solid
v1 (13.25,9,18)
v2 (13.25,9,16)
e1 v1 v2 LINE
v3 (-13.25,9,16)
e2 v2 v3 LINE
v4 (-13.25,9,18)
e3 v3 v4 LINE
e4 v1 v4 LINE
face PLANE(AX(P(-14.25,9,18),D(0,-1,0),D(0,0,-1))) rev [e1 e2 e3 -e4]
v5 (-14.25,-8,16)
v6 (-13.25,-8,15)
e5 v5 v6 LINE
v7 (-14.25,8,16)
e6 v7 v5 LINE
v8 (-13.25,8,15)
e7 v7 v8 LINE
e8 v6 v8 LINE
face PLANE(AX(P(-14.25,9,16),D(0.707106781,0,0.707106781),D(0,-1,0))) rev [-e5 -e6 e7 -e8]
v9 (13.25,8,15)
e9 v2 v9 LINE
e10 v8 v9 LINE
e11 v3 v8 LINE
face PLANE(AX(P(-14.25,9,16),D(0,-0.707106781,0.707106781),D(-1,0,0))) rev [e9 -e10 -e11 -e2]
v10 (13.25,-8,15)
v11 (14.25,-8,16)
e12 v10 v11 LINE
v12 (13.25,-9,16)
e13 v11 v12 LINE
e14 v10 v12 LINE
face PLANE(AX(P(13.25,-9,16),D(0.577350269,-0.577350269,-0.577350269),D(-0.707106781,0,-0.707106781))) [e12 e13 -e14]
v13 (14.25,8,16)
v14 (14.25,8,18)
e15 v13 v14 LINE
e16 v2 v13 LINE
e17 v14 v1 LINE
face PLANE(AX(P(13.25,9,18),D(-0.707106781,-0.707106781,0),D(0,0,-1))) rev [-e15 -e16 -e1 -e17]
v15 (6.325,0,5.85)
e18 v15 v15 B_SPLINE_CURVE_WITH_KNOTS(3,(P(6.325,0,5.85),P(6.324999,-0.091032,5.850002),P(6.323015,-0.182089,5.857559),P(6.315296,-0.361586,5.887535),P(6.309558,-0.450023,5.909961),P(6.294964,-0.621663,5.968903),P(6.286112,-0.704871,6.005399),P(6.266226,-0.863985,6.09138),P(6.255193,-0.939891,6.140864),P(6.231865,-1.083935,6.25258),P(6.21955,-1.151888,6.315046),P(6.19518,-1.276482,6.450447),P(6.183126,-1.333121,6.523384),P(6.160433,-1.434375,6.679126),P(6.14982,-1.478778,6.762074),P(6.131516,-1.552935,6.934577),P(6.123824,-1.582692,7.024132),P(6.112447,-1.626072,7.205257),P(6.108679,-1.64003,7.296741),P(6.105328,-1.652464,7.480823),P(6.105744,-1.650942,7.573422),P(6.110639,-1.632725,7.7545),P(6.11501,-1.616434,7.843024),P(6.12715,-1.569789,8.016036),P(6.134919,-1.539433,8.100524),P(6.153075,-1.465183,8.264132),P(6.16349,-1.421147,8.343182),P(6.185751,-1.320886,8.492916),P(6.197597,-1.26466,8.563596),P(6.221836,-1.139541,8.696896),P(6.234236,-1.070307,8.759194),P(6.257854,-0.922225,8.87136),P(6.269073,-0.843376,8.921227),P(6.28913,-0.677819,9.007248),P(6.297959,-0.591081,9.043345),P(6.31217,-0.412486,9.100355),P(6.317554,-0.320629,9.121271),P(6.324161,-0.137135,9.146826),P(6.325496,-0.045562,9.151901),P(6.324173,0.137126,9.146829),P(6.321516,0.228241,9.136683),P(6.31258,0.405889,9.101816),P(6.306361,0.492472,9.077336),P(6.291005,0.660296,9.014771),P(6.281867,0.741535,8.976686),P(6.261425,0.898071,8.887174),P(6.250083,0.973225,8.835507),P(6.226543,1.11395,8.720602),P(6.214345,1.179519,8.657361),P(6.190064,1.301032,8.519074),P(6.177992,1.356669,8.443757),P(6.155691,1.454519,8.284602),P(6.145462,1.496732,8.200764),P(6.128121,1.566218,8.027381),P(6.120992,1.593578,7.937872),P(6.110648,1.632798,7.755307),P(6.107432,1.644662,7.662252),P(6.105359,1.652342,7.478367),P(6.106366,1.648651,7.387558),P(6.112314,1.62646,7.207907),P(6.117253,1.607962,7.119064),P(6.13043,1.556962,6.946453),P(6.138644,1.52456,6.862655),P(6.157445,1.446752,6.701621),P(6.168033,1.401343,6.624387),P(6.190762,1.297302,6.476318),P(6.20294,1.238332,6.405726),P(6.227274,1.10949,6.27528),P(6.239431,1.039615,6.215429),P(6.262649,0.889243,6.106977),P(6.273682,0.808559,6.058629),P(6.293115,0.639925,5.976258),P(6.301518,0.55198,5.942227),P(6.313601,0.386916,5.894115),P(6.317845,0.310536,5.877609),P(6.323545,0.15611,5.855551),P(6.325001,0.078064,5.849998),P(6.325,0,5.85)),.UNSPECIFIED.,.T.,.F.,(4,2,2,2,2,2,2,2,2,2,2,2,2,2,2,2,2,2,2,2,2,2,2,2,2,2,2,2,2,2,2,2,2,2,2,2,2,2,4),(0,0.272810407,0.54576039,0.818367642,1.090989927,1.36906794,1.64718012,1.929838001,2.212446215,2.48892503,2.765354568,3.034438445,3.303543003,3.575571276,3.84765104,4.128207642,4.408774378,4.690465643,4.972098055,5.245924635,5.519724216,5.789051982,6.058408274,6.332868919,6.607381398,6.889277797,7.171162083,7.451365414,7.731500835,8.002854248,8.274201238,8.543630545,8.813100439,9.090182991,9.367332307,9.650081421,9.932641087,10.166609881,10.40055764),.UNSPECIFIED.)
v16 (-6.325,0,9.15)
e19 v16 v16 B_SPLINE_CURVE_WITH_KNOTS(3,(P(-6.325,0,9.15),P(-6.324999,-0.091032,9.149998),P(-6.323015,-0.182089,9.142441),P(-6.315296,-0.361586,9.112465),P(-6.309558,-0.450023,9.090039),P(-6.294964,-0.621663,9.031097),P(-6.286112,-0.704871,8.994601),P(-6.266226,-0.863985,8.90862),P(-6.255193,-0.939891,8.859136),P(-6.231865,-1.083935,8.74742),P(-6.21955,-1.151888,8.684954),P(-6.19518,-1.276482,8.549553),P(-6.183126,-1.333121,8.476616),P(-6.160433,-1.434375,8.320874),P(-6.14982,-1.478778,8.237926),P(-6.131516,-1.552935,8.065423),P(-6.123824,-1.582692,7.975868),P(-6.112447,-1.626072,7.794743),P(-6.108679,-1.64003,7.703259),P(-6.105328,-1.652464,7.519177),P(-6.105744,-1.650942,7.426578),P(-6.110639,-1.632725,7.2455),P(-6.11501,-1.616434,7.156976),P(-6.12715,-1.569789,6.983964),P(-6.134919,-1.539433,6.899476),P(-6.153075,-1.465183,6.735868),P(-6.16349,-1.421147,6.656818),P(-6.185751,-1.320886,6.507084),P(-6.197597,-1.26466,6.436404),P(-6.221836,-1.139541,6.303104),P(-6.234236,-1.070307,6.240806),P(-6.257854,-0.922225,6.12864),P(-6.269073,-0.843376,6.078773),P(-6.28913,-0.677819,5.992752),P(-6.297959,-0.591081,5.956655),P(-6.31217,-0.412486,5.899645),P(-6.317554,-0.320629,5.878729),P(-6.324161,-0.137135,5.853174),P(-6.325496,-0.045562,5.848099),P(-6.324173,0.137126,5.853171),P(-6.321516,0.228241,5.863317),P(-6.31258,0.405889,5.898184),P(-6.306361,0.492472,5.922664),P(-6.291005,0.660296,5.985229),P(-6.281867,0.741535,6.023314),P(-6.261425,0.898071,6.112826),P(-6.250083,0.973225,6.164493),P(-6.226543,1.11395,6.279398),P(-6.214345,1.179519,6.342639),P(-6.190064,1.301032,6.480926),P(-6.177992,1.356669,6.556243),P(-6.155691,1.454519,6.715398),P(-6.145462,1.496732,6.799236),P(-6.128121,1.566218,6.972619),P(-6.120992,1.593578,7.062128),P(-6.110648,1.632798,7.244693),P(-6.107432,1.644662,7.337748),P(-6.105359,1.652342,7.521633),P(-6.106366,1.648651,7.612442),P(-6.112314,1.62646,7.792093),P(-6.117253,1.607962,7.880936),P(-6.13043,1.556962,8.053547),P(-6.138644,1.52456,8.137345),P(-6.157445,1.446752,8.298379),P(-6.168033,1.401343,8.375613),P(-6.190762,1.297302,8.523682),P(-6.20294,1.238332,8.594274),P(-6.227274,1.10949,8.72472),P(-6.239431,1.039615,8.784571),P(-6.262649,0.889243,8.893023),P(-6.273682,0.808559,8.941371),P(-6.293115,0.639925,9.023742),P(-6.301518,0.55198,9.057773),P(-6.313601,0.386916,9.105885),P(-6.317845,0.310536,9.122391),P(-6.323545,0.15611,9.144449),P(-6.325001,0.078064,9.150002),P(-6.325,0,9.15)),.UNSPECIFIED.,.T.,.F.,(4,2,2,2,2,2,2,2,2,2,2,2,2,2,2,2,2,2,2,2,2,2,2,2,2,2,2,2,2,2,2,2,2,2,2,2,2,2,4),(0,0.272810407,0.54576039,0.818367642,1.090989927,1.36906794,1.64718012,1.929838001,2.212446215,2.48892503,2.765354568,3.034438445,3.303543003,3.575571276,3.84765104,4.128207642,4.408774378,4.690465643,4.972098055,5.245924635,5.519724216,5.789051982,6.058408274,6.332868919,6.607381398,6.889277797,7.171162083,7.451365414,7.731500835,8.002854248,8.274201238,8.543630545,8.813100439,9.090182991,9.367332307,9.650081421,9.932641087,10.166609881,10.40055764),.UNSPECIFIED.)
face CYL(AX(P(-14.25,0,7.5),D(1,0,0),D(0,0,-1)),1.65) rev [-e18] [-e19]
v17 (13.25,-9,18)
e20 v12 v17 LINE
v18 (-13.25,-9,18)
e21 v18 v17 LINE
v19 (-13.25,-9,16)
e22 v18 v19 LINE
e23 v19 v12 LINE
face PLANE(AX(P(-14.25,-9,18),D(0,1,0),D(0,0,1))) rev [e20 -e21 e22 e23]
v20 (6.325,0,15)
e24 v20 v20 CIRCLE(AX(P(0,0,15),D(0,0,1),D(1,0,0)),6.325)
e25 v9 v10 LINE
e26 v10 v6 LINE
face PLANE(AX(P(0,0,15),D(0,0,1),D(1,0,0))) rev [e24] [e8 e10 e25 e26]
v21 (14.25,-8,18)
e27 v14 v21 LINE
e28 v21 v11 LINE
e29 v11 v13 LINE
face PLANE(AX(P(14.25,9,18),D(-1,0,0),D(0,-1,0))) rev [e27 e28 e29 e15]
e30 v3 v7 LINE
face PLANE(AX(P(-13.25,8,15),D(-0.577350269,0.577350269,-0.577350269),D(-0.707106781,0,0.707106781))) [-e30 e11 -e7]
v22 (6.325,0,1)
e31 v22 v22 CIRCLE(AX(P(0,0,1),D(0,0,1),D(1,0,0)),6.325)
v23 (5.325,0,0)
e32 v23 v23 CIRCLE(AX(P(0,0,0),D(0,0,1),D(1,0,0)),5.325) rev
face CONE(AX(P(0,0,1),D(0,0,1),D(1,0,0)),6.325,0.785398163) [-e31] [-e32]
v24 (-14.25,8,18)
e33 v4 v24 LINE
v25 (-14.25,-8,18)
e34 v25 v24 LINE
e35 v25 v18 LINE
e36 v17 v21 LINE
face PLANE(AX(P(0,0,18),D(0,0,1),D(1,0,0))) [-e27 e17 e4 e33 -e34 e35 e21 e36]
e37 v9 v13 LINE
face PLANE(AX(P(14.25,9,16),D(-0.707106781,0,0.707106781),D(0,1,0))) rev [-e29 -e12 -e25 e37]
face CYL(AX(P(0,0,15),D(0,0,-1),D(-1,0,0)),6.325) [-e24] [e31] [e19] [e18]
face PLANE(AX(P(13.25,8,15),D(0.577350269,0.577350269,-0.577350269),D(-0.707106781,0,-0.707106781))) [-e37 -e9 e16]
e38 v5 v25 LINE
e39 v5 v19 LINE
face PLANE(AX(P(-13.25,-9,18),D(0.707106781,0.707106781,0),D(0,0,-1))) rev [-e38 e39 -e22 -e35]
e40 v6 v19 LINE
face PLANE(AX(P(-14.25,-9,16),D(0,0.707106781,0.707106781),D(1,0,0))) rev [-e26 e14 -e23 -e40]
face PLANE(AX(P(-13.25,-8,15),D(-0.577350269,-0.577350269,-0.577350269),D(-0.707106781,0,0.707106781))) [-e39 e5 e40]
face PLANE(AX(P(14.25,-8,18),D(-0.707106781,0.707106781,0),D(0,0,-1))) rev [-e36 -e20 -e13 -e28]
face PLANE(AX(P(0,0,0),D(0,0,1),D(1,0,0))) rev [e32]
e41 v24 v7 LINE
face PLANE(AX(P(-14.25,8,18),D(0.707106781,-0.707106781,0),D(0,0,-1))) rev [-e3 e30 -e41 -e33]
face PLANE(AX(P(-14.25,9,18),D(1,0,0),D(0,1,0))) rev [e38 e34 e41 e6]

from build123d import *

# Parameters (mm, degrees)
SKETCH_1_R               = 6.325
EXTRUDE_1_DEPTH          = 15
SKETCH_2_W               = 28.5
SKETCH_2_H               = 18
EXTRUDE_2_DEPTH          = 3
EXTRUDE_START            = 14.25
SKETCH_4_R               = 1.6
EXTRUDE_3_DEPTH          = 7
EXTRUDE_START_2          = -7.25
SKETCH_4_2_R             = 1.6
EXTRUDE_4_DEPTH          = 7
EXTRUDE_START_3          = -7
EXTRUDE_5_DEPTH          = 7
SKETCH_7_R               = 1.75
CUT_EXTRUDE_1_DEPTH      = 65.242217427
CHAMFER_1_SIZE           = 1
CHAMFER_2_SIZE           = 1
CUT_EXTRUDE_2_DEPTH      = 64.238141181
CUT_EXTRUDE_2_DEPTH_BACK = 64.238141181
SKETCH_8_R               = 1.65
CUT_EXTRUDE_START        = -18
CUT_EXTRUDE_3_OUTLINE_W  = 7
CUT_EXTRUDE_3_OUTLINE_H  = 43
CUT_EXTRUDE_3_OUTLINE_R  = 1.75
CUT_EXTRUDE_3_DEPTH      = 23


# Read off the part's stored shape, not the designer's step: ｶｯﾄ - 押し出し3
with BuildPart() as part:
    # ｽｹｯﾁ1 → ﾎﾞｽ - 押し出し1 (new body)
    with BuildSketch(Plane.XY):
        Circle(SKETCH_1_R)
    extrude(amount=EXTRUDE_1_DEPTH)

    # ｽｹｯﾁ2 → ﾎﾞｽ - 押し出し2 (add)
    with BuildSketch(Plane.XY.offset(15)):
        Rectangle(SKETCH_2_W, SKETCH_2_H)
    extrude(amount=EXTRUDE_2_DEPTH)

    # ｽｹｯﾁ4 → ﾎﾞｽ - 押し出し3 (add)
    with BuildSketch(Plane(origin=(0, 0, 0), x_dir=(0, 0, -1), z_dir=(1, 0, 0)).offset(EXTRUDE_START)):
        with BuildLine():
            Line((-54.074074074, 13.913518208), (-28, 9))
            Line((-28, 9), (-18, 9))
            Line((-18, 9), (-18, -9))
            Line((-18, -9), (-56.624751337, 4.271344473))
            ThreePointArc((-56.624751337, 4.271344473), (-59.833732287, 10.278683768), (-54.074074074, 13.913518208))
        make_face()
        with Locations(Location((-55, 9, 0), (0, 0, 270))):
            Circle(SKETCH_4_R, mode=Mode.SUBTRACT)
    extrude(amount=-EXTRUDE_3_DEPTH)

    # ｽｹｯﾁ4<2> → ﾎﾞｽ - 押し出し4 (add)
    with BuildSketch(Plane(origin=(0, 0, 0), x_dir=(0, 0, -1), z_dir=(1, 0, 0)).offset(EXTRUDE_START_2)):
        with BuildLine():
            Line((-54.074074074, 13.913518208), (-28, 9))
            Line((-28, 9), (-18, 9))
            Line((-18, 9), (-18, -9))
            Line((-18, -9), (-56.624751337, 4.271344473))
            ThreePointArc((-56.624751337, 4.271344473), (-59.833732287, 10.278683768), (-54.074074074, 13.913518208))
        make_face()
        with Locations(Location((-55, 9, 0), (0, 0, 270))):
            Circle(SKETCH_4_2_R, mode=Mode.SUBTRACT)
    extrude(amount=-EXTRUDE_4_DEPTH)

    # ｽｹｯﾁ5 → ﾎﾞｽ - 押し出し5 (add)
    with BuildSketch(Plane.ZY.offset(14.25).offset(EXTRUDE_START_3)):
        with BuildLine():
            Line((18, -9), (33.823085464, -9))
            Line((33.823085464, -9), (57.5, 4.669872981))
            ThreePointArc((57.5, 4.669872981), (57.071979643, 4.44951647), (56.624751337, 4.271344473))
            Line((56.624751337, 4.271344473), (18, -9))
        make_face()
    extrude_5 = extrude(amount=EXTRUDE_5_DEPTH)

    # ﾐﾗｰ1: ﾎﾞｽ - 押し出し5 across plane
    add(extrude_5.mirror(Plane(origin=(0, 0, 0), x_dir=(0, 0, 1), z_dir=(1, 0, 0))))

    # ｽｹｯﾁ7 → ｶｯﾄ - 押し出し1 (cut, through all)
    with BuildSketch(Plane(origin=(0, 9, 0), x_dir=(1, 0, 0), z_dir=(0, 1, 0))):
        with Locations(Location((10.75, -23, 0), (0, 0, 270))):
            Circle(SKETCH_7_R)
        with Locations(Location((-10.75, -23, 0), (0, 0, 90))):
            Circle(SKETCH_7_R)
    extrude(amount=-CUT_EXTRUDE_1_DEPTH, mode=Mode.SUBTRACT)

    # 面取り1
    chamfer_1_edges = [part.edges().sort_by_distance(p)[0] for p in [
        (14.25, 11.456759104, 41.037037037),
        (-14.25, 11.456759104, 41.037037037),
        (-14.25, 10.737621487, 59.688354889),
        (-14.25, -2.165063509, 45.661542732),
        (14.25, 0, 15),
        (14.25, -9, 24.411542732),
        (0, 9, 15),
        (14.25, 10.737621487, 59.688354889),
        (14.25, 9, 21.5),
        (-14.25, 0, 15),
        (14.25, -2.165063509, 45.661542732),
        (-14.25, 9, 21.5),
        (0, -9, 15),
        (-14.25, -9, 24.411542732),
    ]]
    chamfer(chamfer_1_edges, length=CHAMFER_1_SIZE)

    # 面取り2
    chamfer_2_edges = [part.edges().sort_by_distance(p)[0] for p in [
        (-6.325, 0, 0),
    ]]
    chamfer(chamfer_2_edges, length=CHAMFER_2_SIZE)

    # ｽｹｯﾁ8 → ｶｯﾄ - 押し出し2 (cut, two sides: drawn at the far end of the back side and taken through both)
    with BuildSketch(Plane(origin=(0, 0, 0), x_dir=(0, 0, -1), z_dir=(1, 0, 0)).offset(-CUT_EXTRUDE_2_DEPTH_BACK)):
        with Locations(Location((-7.5, 0, 0), (0, 0, 180))):
            Circle(SKETCH_8_R)
    extrude(amount=CUT_EXTRUDE_2_DEPTH + CUT_EXTRUDE_2_DEPTH_BACK, mode=Mode.SUBTRACT)

    # ｶｯﾄ - 押し出し3 outline → ｶｯﾄ - 押し出し3 (cut)
    # profile 1 of 2: a face of its own
    with BuildSketch(Plane(origin=(0, 9, 0), x_dir=(1, 0, 0), z_dir=(0, 1, 0)).offset(CUT_EXTRUDE_START)):
        with Locations((-10.75, -39.5)):
            Rectangle(CUT_EXTRUDE_3_OUTLINE_W, CUT_EXTRUDE_3_OUTLINE_H)
        with Locations((-10.75, -23)):
            Circle(CUT_EXTRUDE_3_OUTLINE_R, mode=Mode.SUBTRACT)
    # profile 2 of 2: a face of its own
    with BuildSketch(Plane(origin=(0, 9, 0), x_dir=(1, 0, 0), z_dir=(0, 1, 0)).offset(CUT_EXTRUDE_START)):
        with Locations((10.75, -39.5)):
            Rectangle(CUT_EXTRUDE_3_OUTLINE_W, CUT_EXTRUDE_3_OUTLINE_H)
        with Locations((10.75, -23)):
            Circle(CUT_EXTRUDE_3_OUTLINE_R, mode=Mode.SUBTRACT)
    extrude(amount=CUT_EXTRUDE_3_DEPTH, mode=Mode.SUBTRACT)


solid = part.part
